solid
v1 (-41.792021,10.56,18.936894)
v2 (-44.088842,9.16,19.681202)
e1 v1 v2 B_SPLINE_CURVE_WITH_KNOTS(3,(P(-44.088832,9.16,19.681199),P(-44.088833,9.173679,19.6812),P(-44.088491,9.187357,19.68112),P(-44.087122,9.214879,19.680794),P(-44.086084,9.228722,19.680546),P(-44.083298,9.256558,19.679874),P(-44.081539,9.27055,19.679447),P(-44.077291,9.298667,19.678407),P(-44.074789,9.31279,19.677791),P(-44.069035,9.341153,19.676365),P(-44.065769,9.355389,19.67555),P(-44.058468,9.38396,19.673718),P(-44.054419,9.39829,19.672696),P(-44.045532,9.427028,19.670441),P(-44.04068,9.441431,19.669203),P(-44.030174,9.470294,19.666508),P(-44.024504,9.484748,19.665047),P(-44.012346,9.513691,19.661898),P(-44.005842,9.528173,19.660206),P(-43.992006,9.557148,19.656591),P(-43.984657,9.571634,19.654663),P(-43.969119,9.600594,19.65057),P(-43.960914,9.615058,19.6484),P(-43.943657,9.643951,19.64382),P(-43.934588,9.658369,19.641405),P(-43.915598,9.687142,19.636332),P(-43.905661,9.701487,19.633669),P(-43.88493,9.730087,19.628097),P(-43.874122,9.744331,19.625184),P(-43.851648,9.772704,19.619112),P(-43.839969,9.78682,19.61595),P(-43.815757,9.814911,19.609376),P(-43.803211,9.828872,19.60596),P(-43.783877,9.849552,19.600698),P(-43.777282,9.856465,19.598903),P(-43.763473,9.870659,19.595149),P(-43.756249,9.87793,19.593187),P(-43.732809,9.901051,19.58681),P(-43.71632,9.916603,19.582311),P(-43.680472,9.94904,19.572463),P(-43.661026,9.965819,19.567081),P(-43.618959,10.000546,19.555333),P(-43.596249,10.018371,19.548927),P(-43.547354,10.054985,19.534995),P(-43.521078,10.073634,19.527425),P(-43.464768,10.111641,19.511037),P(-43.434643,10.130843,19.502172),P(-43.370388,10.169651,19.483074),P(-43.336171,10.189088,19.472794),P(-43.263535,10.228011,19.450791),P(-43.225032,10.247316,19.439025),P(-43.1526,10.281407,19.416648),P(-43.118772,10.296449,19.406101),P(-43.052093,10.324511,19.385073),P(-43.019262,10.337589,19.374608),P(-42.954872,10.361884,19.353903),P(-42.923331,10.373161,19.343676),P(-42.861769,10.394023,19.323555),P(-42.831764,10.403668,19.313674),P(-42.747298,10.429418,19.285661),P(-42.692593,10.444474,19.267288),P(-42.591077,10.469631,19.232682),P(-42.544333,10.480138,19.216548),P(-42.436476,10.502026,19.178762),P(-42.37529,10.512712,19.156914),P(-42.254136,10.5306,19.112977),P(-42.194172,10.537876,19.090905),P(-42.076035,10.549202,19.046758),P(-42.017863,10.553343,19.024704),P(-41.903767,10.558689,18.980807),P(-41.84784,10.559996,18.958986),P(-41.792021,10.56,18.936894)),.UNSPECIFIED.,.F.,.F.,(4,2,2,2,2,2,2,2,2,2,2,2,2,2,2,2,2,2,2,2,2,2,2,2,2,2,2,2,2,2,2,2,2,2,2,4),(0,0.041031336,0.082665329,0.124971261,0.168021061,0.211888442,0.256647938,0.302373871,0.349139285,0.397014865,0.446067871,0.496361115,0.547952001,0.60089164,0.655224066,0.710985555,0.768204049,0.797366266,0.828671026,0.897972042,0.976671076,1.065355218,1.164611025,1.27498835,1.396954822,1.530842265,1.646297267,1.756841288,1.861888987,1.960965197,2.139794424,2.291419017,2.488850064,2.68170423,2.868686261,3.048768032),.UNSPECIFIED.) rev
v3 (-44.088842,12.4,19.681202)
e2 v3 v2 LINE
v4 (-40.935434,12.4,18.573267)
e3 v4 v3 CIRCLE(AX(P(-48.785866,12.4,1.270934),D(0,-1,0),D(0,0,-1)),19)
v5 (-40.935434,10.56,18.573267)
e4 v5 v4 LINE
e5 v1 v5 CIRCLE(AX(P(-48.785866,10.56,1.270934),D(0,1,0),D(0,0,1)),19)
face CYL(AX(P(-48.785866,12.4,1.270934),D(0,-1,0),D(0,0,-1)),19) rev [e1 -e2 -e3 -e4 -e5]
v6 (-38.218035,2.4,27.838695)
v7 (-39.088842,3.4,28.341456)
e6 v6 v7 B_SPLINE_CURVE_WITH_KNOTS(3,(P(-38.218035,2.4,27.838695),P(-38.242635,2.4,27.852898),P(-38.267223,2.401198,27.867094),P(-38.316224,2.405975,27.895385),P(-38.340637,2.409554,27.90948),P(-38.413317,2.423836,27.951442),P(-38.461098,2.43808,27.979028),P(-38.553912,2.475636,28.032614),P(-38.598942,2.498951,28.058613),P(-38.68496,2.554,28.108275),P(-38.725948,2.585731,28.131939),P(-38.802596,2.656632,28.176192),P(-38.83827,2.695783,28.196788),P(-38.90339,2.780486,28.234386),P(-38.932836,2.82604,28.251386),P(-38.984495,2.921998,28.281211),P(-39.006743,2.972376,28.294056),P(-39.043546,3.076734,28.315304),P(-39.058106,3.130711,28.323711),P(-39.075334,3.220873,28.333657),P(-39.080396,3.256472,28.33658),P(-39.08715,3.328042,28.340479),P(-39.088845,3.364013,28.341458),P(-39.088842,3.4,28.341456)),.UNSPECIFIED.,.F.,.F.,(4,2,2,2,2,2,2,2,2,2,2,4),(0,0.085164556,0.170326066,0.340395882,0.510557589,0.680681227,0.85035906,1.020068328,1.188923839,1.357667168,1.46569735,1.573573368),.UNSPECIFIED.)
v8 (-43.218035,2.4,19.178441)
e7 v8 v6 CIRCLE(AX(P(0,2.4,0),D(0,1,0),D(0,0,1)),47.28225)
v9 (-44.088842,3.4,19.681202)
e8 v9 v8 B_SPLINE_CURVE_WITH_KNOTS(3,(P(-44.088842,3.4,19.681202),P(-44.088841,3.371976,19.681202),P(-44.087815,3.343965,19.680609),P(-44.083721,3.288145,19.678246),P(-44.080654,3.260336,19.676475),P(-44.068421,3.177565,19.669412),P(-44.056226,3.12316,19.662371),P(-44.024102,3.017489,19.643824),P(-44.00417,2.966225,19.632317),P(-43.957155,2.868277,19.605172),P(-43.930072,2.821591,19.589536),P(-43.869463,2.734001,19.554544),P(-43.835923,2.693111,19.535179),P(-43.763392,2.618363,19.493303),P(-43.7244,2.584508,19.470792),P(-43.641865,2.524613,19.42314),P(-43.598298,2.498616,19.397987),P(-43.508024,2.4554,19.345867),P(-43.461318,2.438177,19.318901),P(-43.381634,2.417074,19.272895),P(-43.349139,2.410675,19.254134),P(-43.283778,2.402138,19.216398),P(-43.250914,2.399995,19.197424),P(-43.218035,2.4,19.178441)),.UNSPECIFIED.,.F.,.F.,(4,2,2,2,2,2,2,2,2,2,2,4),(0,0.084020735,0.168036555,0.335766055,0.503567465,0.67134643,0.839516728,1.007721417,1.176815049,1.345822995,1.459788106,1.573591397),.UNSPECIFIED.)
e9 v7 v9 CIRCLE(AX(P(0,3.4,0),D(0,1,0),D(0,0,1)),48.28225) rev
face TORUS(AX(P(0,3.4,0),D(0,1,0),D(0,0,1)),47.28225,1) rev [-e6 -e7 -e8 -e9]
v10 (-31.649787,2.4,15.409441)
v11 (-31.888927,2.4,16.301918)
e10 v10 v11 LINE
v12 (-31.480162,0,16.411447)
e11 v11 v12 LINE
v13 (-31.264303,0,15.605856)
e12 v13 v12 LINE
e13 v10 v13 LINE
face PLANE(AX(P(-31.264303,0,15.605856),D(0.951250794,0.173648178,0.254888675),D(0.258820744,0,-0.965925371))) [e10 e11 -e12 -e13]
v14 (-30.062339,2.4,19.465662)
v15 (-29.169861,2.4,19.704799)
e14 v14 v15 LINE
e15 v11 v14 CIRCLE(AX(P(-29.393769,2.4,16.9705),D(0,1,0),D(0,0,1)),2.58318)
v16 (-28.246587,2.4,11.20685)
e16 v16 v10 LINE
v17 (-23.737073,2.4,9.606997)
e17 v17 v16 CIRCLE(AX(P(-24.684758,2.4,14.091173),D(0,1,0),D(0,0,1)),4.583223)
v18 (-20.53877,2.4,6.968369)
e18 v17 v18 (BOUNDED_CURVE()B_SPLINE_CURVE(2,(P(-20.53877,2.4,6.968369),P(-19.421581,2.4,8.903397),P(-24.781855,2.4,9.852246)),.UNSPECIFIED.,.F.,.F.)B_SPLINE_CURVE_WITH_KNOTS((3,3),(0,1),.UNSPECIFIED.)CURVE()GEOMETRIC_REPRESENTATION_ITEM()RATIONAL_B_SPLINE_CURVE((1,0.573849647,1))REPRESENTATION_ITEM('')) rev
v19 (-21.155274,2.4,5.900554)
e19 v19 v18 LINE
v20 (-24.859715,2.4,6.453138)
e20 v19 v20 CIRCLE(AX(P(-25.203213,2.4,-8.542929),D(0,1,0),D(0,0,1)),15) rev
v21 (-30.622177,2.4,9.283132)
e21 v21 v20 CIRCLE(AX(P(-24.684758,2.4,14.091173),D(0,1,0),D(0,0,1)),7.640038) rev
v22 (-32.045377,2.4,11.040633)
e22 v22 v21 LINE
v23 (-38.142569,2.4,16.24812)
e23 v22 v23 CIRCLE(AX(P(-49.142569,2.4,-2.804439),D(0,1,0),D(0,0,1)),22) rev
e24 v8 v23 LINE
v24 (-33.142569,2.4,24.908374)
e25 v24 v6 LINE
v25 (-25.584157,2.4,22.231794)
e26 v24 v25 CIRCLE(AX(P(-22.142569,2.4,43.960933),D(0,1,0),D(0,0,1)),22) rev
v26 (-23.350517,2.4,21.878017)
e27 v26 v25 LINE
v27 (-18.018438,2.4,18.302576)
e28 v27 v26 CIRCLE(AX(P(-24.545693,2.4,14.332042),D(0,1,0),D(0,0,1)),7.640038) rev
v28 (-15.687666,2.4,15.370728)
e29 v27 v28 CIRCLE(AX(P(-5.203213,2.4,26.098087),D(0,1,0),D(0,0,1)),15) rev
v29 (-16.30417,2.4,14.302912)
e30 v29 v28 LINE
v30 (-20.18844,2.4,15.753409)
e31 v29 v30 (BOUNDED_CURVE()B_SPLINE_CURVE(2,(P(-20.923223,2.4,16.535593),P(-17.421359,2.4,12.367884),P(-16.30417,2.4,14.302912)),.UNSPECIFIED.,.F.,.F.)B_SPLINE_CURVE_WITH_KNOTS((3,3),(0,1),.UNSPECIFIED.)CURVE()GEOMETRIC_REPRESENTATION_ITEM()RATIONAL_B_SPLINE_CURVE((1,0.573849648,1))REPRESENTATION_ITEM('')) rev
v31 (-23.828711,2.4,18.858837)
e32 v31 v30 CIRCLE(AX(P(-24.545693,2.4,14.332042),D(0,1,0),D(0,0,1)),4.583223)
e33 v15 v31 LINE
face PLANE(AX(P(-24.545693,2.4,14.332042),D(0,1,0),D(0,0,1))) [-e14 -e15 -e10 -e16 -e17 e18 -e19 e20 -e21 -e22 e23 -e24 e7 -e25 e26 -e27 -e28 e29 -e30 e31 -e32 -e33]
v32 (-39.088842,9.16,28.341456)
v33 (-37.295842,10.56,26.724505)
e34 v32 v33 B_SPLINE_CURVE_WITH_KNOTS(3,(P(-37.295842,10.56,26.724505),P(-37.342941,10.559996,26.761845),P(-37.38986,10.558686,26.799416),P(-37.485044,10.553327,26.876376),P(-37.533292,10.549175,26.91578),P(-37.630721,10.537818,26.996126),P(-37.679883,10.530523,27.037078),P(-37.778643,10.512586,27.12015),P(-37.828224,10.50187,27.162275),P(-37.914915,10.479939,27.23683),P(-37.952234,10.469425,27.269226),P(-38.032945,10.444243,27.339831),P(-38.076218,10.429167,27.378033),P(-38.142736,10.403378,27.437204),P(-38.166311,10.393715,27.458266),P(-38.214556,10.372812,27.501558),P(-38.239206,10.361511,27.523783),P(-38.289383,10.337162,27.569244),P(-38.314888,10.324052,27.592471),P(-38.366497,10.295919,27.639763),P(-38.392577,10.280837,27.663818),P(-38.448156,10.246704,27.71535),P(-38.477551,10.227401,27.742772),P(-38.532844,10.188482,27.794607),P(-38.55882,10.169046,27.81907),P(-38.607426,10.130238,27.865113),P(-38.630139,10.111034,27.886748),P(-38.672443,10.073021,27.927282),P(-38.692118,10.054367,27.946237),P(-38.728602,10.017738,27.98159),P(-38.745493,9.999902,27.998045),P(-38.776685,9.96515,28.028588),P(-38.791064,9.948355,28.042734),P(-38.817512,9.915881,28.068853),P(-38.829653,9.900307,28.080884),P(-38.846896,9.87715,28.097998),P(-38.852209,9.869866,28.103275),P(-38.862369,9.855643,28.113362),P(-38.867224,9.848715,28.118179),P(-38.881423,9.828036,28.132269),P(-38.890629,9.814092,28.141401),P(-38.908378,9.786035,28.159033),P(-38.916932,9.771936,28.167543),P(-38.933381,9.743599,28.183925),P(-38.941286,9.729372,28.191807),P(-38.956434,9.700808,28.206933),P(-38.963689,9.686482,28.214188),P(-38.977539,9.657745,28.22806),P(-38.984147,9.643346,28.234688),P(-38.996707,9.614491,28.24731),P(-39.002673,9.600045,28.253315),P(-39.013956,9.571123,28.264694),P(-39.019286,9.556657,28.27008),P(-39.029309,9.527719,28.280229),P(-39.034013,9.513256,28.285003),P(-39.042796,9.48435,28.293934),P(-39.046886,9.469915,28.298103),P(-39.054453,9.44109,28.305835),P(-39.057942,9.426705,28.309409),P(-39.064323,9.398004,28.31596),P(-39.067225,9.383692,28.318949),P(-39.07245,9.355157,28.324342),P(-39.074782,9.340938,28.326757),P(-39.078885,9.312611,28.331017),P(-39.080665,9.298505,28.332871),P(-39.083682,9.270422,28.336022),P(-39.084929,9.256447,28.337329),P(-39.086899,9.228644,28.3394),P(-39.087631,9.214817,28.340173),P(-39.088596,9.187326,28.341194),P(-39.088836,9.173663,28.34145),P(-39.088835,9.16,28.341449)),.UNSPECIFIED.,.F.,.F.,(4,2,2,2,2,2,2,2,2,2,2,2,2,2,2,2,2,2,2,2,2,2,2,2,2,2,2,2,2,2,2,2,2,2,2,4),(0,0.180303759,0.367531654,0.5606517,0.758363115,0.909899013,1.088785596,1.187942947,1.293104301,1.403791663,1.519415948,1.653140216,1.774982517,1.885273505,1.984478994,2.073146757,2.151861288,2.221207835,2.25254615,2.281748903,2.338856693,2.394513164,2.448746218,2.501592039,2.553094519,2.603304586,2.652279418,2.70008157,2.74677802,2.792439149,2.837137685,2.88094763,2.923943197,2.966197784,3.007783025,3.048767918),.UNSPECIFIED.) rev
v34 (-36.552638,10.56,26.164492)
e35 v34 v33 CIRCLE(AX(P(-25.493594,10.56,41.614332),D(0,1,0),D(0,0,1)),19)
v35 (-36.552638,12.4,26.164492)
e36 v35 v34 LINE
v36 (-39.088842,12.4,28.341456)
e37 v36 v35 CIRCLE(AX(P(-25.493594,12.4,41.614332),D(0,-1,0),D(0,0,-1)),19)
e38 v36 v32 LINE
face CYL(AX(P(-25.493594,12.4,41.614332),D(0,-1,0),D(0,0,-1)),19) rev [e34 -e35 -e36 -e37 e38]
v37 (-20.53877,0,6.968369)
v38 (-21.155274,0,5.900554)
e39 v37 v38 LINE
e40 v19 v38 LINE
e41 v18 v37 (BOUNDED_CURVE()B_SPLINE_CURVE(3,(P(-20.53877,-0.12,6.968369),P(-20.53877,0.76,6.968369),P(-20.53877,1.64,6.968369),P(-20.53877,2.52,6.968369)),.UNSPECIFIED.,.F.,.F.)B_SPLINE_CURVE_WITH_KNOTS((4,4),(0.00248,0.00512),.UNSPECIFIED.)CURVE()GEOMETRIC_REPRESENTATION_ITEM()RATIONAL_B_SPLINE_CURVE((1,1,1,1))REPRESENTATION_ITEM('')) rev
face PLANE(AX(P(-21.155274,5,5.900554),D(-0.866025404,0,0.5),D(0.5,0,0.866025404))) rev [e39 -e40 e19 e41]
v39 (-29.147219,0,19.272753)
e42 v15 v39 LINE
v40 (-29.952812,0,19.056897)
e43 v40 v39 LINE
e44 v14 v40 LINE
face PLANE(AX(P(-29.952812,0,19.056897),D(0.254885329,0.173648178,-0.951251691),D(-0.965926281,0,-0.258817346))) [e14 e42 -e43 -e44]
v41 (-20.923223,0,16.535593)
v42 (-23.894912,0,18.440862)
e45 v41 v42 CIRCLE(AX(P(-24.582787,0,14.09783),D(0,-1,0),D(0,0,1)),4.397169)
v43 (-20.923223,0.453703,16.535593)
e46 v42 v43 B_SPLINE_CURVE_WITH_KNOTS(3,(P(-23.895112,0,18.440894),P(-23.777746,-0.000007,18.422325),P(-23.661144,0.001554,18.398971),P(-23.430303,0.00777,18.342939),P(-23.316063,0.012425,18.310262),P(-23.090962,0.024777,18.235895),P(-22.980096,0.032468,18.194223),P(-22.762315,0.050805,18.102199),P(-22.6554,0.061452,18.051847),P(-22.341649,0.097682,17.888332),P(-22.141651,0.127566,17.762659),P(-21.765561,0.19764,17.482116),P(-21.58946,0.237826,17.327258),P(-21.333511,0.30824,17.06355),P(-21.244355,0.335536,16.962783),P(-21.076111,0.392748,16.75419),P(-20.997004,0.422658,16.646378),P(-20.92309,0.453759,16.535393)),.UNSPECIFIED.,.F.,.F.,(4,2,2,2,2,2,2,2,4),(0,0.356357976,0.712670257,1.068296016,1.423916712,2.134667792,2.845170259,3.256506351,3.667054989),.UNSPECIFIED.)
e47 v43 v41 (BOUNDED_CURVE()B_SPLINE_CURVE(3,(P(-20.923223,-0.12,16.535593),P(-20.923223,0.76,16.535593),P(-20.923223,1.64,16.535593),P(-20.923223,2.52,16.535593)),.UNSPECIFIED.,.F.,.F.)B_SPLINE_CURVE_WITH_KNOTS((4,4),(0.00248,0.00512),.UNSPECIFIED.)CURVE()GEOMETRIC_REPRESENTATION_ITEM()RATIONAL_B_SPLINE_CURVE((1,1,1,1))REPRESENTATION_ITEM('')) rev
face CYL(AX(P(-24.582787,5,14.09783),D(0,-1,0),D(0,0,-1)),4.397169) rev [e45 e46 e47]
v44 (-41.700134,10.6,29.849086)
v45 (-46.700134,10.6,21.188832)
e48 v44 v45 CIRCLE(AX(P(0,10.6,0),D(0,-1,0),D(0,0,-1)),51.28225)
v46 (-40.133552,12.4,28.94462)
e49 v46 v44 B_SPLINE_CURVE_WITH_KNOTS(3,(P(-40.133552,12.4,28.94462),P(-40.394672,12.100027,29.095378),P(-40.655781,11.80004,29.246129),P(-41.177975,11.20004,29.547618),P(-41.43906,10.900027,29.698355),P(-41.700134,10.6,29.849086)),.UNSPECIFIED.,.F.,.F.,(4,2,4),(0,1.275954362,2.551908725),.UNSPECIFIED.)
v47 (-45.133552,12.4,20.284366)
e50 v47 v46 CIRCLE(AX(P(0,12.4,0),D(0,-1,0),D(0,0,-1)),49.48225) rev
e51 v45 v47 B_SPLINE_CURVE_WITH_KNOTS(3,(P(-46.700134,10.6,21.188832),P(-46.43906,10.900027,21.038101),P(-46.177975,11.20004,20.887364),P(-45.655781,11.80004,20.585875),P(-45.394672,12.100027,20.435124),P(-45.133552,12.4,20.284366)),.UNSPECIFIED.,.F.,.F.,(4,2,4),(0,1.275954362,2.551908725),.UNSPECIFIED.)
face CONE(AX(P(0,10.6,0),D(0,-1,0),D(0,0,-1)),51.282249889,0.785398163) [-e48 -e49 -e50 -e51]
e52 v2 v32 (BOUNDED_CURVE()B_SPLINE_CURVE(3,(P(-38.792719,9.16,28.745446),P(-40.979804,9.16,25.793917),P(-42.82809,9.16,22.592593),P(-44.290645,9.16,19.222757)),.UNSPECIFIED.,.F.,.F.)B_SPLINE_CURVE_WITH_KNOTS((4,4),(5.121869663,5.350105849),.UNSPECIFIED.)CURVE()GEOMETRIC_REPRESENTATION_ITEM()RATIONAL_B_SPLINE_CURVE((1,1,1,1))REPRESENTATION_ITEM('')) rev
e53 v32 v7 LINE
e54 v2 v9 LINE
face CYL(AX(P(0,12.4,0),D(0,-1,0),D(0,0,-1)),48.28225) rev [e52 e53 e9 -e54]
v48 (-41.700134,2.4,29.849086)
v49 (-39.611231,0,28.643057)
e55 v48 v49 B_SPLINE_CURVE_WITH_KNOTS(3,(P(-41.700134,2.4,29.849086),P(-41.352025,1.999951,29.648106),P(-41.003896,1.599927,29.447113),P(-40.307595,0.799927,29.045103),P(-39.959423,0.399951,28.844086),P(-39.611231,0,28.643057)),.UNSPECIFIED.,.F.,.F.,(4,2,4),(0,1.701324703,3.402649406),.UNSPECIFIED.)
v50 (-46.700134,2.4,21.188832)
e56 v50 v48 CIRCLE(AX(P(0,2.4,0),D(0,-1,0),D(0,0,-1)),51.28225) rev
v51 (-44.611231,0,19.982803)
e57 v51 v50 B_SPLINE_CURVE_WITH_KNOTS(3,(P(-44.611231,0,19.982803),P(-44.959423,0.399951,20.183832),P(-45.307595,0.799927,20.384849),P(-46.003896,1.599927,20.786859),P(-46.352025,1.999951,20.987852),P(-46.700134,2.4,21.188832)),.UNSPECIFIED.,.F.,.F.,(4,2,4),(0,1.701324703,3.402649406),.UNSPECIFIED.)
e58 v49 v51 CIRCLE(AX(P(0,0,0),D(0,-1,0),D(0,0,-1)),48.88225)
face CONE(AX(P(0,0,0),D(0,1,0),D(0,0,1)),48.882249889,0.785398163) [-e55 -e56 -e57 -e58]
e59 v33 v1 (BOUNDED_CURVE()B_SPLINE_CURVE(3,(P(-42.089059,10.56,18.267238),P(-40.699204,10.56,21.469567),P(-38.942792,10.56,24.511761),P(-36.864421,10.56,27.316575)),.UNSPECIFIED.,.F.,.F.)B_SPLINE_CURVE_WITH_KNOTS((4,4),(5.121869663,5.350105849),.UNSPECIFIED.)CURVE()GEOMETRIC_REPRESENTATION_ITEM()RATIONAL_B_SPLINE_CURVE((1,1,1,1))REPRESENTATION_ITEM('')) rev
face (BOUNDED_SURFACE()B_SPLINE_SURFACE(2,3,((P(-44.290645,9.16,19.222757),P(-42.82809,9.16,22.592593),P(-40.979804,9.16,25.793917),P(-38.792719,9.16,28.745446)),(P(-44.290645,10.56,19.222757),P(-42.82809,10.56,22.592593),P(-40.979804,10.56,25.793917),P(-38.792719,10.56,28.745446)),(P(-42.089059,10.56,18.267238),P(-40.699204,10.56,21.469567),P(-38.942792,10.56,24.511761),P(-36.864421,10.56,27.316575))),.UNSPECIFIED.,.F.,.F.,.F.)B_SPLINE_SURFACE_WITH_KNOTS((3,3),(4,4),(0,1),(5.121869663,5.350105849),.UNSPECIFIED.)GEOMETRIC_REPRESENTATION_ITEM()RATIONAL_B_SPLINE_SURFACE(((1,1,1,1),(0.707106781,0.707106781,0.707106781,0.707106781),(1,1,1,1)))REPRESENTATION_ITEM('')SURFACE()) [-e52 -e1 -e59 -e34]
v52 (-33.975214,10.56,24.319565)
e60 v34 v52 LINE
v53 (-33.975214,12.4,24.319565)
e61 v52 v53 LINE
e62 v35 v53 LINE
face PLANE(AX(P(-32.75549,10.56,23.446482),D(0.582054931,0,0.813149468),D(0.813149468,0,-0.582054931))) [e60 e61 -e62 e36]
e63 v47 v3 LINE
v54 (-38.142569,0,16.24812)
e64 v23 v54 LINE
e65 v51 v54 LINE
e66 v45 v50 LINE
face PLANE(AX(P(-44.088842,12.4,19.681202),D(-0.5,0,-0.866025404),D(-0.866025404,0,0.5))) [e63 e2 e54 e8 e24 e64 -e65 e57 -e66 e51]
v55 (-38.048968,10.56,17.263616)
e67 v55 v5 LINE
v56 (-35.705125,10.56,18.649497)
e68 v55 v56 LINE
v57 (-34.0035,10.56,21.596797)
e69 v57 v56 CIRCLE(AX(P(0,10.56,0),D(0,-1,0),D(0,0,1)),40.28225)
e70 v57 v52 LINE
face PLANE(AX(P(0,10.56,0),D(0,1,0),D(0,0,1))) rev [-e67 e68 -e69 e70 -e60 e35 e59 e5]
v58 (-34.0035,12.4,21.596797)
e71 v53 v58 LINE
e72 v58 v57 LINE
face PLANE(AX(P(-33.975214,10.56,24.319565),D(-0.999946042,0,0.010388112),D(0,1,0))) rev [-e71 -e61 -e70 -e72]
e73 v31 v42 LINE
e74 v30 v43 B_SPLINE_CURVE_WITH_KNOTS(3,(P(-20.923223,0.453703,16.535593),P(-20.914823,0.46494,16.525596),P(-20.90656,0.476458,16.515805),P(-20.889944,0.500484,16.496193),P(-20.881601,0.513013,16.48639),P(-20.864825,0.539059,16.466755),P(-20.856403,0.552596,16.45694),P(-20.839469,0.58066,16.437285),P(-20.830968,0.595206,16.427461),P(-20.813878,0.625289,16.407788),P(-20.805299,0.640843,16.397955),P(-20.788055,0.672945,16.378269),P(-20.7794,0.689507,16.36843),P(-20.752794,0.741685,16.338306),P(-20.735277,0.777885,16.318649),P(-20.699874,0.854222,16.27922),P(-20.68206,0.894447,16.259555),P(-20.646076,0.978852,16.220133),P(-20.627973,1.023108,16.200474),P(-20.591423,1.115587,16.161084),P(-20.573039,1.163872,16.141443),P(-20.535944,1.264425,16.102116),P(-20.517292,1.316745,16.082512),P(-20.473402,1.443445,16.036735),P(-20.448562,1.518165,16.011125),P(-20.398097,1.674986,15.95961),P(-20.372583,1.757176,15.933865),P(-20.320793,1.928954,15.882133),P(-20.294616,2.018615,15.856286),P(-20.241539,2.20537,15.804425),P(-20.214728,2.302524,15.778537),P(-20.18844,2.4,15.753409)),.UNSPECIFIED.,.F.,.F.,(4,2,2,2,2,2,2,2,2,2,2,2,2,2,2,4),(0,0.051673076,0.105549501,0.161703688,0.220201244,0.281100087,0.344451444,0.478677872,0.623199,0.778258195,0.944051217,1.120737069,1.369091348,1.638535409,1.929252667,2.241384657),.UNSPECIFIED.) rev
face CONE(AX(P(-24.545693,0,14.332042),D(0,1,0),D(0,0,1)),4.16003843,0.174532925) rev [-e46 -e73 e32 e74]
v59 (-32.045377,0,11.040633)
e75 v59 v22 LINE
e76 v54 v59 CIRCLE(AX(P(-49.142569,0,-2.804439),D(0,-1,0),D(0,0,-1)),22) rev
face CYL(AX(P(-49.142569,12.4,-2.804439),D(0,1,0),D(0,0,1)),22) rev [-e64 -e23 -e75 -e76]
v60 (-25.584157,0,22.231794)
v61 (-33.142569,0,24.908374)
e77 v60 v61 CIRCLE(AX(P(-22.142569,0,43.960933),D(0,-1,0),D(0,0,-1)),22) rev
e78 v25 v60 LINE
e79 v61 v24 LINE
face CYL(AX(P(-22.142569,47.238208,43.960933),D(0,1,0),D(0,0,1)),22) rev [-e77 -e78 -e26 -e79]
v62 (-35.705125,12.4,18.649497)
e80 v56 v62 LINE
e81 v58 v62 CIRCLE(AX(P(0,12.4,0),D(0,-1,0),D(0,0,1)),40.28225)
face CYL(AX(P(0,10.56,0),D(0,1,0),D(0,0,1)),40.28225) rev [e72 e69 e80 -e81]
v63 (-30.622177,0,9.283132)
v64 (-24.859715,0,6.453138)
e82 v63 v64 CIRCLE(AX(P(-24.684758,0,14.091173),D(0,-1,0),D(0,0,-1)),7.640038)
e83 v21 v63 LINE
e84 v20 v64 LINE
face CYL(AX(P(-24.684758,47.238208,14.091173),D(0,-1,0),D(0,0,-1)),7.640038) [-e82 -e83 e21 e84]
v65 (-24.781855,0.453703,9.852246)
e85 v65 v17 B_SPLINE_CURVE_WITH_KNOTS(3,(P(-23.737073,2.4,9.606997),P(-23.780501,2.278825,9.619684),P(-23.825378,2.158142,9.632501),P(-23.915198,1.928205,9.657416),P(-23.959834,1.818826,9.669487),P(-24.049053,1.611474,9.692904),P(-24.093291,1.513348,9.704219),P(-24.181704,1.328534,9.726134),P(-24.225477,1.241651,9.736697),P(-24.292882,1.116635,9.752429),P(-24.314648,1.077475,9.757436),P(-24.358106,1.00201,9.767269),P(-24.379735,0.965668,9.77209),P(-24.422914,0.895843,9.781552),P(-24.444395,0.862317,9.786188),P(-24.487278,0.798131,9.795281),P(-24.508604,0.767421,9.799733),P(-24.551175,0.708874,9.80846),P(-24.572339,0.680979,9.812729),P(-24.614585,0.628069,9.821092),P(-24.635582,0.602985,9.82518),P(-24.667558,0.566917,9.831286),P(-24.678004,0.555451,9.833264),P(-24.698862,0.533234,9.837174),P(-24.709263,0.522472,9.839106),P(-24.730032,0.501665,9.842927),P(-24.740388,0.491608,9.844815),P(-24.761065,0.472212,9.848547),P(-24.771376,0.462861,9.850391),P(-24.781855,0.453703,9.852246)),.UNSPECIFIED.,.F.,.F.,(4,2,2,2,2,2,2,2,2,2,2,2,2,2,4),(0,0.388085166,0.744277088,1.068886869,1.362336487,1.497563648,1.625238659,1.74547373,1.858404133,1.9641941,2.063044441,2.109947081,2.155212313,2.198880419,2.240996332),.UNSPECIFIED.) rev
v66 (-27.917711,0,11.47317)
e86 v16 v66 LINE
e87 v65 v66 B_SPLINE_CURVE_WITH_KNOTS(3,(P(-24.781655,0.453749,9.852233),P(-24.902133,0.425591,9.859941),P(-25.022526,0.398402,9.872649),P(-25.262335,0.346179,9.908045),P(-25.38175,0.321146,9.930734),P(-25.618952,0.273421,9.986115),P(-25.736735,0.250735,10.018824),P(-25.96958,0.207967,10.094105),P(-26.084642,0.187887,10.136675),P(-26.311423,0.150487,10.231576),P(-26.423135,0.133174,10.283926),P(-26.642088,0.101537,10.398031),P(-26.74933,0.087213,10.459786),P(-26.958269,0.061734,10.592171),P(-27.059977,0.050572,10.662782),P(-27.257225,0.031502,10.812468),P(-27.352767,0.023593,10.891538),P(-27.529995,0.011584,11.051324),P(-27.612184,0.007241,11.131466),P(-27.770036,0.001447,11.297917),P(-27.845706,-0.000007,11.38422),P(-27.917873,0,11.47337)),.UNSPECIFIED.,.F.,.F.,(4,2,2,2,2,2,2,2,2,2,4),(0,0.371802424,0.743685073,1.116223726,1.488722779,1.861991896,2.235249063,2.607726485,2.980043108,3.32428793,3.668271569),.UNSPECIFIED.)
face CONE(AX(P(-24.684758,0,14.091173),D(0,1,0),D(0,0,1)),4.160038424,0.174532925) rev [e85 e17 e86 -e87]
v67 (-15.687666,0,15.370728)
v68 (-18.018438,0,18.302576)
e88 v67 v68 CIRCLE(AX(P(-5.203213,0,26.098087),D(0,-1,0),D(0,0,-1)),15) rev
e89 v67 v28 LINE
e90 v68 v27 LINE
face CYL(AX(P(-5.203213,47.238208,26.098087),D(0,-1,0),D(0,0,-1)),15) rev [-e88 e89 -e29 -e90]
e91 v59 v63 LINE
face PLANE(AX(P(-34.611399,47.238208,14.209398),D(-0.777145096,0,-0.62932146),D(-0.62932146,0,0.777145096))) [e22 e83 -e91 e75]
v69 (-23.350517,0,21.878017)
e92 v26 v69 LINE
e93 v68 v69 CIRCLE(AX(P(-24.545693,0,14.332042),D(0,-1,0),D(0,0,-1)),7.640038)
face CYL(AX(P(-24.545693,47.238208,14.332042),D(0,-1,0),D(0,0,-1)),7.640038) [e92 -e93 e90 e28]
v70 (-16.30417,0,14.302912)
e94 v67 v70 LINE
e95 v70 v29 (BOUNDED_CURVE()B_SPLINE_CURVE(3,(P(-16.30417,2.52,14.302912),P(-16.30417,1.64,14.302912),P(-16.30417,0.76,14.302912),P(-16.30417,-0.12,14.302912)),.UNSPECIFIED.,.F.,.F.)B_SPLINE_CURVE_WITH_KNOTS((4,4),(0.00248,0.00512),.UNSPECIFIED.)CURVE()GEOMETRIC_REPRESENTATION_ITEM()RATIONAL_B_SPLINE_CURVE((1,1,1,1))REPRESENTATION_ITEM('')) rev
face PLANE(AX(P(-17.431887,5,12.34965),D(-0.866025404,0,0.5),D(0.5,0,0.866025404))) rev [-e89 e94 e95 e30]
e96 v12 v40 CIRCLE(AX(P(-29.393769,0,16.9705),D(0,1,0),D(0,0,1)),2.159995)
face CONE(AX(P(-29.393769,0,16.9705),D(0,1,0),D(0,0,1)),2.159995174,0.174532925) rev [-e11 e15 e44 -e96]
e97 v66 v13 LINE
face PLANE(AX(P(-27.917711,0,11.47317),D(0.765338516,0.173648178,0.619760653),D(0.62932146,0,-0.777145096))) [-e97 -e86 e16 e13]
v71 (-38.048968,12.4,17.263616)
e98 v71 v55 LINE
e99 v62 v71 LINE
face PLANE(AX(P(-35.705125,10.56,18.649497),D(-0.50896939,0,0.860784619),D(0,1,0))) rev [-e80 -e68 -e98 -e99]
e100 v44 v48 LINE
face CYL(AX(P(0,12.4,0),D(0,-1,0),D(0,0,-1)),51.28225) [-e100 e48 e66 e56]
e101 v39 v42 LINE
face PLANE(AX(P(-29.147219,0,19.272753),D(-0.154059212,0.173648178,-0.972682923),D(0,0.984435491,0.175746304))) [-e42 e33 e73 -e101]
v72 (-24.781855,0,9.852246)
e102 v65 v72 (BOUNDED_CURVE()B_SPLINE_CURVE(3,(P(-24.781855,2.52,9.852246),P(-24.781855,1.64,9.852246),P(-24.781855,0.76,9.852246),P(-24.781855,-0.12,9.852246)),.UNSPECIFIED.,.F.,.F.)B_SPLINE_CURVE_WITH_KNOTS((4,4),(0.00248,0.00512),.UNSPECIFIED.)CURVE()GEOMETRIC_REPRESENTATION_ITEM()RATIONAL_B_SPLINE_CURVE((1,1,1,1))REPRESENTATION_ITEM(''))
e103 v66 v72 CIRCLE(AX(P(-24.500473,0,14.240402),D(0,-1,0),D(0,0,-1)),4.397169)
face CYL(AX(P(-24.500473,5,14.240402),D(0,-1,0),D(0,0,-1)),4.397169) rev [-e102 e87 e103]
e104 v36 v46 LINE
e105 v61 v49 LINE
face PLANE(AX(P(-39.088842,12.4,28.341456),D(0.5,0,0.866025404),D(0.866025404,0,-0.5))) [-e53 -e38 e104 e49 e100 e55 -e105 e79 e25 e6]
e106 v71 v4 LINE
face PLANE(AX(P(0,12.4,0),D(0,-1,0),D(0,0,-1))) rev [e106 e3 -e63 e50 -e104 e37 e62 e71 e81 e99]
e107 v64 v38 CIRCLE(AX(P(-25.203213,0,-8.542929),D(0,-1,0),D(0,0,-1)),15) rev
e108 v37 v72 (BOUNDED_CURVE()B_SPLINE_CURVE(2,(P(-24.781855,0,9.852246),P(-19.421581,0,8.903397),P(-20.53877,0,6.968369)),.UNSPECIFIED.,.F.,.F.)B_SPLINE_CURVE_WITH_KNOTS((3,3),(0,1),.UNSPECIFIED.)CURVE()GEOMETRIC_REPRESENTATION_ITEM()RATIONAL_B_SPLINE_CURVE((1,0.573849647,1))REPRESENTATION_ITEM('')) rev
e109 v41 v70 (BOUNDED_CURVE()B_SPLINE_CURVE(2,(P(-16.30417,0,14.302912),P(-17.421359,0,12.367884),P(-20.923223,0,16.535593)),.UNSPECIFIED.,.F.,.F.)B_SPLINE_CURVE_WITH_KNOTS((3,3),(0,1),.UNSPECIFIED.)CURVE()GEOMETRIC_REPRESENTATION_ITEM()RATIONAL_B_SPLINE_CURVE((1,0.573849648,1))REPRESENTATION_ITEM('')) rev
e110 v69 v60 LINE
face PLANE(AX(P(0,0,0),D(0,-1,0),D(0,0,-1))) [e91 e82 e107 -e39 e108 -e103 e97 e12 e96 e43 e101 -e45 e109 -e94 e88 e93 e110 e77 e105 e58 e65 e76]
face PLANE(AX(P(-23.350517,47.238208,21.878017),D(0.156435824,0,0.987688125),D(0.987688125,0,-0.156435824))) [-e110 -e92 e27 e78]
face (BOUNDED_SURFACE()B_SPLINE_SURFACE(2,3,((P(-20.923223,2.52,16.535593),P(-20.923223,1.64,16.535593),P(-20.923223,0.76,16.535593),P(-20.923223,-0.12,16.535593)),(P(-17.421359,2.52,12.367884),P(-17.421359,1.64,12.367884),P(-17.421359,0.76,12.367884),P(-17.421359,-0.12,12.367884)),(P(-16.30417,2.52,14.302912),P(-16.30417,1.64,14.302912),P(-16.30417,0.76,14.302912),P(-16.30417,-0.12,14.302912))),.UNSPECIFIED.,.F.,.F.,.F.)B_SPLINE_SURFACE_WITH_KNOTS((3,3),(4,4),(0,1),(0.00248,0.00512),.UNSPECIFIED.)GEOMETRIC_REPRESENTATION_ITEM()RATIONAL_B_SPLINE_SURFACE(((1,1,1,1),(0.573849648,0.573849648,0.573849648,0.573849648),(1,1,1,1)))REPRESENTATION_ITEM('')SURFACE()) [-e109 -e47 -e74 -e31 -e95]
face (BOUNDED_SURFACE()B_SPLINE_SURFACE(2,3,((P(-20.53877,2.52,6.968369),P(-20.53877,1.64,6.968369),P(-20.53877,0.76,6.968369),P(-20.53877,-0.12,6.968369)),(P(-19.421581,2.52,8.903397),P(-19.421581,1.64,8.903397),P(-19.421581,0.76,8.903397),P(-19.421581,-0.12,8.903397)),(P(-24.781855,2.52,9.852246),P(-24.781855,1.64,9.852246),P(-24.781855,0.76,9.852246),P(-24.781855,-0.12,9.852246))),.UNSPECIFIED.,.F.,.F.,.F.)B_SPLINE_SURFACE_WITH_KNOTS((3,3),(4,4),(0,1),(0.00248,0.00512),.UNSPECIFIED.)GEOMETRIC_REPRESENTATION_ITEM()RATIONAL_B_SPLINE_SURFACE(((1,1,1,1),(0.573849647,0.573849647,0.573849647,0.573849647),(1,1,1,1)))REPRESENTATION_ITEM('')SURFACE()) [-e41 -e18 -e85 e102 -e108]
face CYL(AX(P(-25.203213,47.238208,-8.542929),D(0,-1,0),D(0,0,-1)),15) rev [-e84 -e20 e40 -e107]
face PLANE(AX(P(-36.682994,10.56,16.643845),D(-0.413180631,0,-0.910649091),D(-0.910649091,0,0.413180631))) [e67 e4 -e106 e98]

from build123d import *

# Parameters (mm, degrees)
EXTRUDE_1_DEPTH     = 2.4
EXTRUDE_1_DRAFT     = 10
EXTRUDE_2_DEPTH     = 12.4
EXTRUDE_4_DEPTH     = 2.4
EXTRUDE_START       = -1.84
EXTRUDE_3_DEPTH     = 1.84
CHAMFER_1_SIZE      = 2.4
FILLET_3_R          = 1
FILLET_4_R          = 19
CHAMFER_2_SIZE      = 1.5
CHAMFER_3_SIZE      = 1.5
FILLET_5_SIZE       = 2.4
FILLET_5_SIZE_2     = 1.4
FILLET_8_R          = 15
CUT_EXTRUDE_2_DEPTH = 5
FILLET_6_DEPTH      = 2.4
FILLET_7_DEPTH      = 2.4
CHAMFER_4_SIZE      = 1.8
FILLET_9_R          = 22


with BuildPart() as part:
    # 草图1 → 凸台-拉伸1 (with draft: the straight prism first)
    with BuildSketch(Plane(origin=(0, 0, 0), x_dir=(1, 0, 0), z_dir=(0, 1, 0))):
        with BuildLine():
            Line((-8, -10.392304845), (-13, -1.732050808))
            Line((-13, -1.732050808), (-21.967816979, -6.909622355))
            Line((-21.967816979, -6.909622355), (-22.707395472, -6.711455524))
            ThreePointArc((-22.707395472, -6.711455524), (-27.045667208, -6.825066474), (-30.622176838, -9.283132374))
            Line((-30.622176838, -9.283132374), (-34.43427487, -13.990668154))
            Line((-34.43427487, -13.990668154), (-34.611399325, -14.209398026))
            Line((-34.611399325, -14.209398026), (-44.088841542, -19.681201841))
            ThreePointArc((-44.088841542, -19.681201841), (-41.813654956, -24.141124945), (-39.088841542, -28.341455878))
            Line((-39.088841542, -28.341455878), (-29.611399325, -22.869652063))
            Line((-29.611399325, -22.869652063), (-29.333411472, -22.825622721))
            Line((-29.333411472, -22.825622721), (-23.350516885, -21.878016874))
            ThreePointArc((-23.350516885, -21.878016874), (-19.433514554, -20.009701627), (-17.165988715, -16.309453567))
            Line((-17.165988715, -16.309453567), (-16.967816979, -15.569876393))
            Line((-16.967816979, -15.569876393), (-8, -10.392304845))
        make_face()
        with BuildLine():
            Line((-27.917710858, -11.473169763), (-31.264303283, -15.605855609))
            Line((-31.264303283, -15.605855609), (-31.480162481, -16.411447438))
            ThreePointArc((-31.480162481, -16.411447438), (-31.264379417, -18.05049777), (-29.952811807, -19.056896659))
            Line((-29.952811807, -19.056896659), (-29.147219046, -19.27275307))
            Line((-29.147219046, -19.27275307), (-23.894912088, -18.440861966))
            ThreePointArc((-23.894912088, -18.440861966), (-21.762087, -17.423555776), (-20.527408298, -15.408754734))
            Line((-20.527408298, -15.408754734), (-19.958845574, -13.286877913))
            ThreePointArc((-19.958845574, -13.286877913), (-20.174626779, -11.647826039), (-21.486196869, -10.641428268))
            Line((-21.486196869, -10.641428268), (-23.608077089, -10.07287972))
            ThreePointArc((-23.608077089, -10.07287972), (-25.97028529, -10.134742248), (-27.917710858, -11.473169763))
        make_face(mode=Mode.SUBTRACT)
    extrude(amount=EXTRUDE_1_DEPTH)
    # 凸台-拉伸1: the draft: its side faces are tilted about the plane it starts from
    extrude_1_sides = [part.faces().sort_by_distance(p)[0] for p in [
        (-26.480958105, 1.2, 22.373834469),
        (-29.59100707, 1.2, 13.539512686),
        (-31.372232882, 1.2, 16.008651523),
        (-31.264379417, 1.2, 18.05049777),
        (-29.550015427, 1.2, 19.164824864),
        (-26.521065567, 1.2, 18.856807518),
        (-21.762087, 1.2, 17.423555776),
        (-20.243126936, 1.2, 14.347816323),
        (-20.174626779, 1.2, 11.647826039),
        (-22.547136979, 1.2, 10.357153994),
        (-25.97028529, 1.2, 10.134742248),
        (-41.813654956, 1.2, 24.141124945),
        (-39.350120434, 1.2, 16.945299933),
        (-32.616788082, 1.2, 11.7462652),
        (-27.045667208, 1.2, 6.825066474),
        (-22.337606226, 1.2, 6.810538939),
        (-17.48390849, 1.2, 4.320836581),
        (-10.5, 1.2, 6.062177826),
        (-12.48390849, 1.2, 12.981090619),
        (-17.066902847, 1.2, 15.93966498),
        (-34.350120433, 1.2, 25.605553971),
        (-19.433514554, 1.2, 20.009701627),
    ]]
    draft(extrude_1_sides, Plane(origin=(0, 0, 0), x_dir=(1, 0, 0), z_dir=(0, 1, 0)), EXTRUDE_1_DRAFT)



with BuildPart() as body_2:
    # 草图3 → 凸台-拉伸2 (new body)
    with BuildSketch(Plane.XZ):
        with BuildLine():
            Line((-39.088841542, 28.341455878), (-41.700134223, 29.849086411))
            ThreePointArc((-41.700134223, 29.849086411), (-44.411731167, 25.641124945), (-46.700134223, 21.188832373))
            Line((-46.700134223, 21.188832373), (-44.088841542, 19.681201841))
            ThreePointArc((-44.088841542, 19.681201841), (-41.813654956, 24.141124945), (-39.088841542, 28.341455878))
        make_face()
    extrude(amount=-EXTRUDE_2_DEPTH)


with BuildPart() as part_1:
    add(part.part)

    add(body_2.part)  # 凸台-拉伸4 merges body 2
    # 草图2 → 凸台-拉伸4 (add)
    with BuildSketch(Plane.XZ):
        with BuildLine():
            Line((-13, 1.732050808), (-8, 10.392304845))
            Line((-8, 10.392304845), (-16.967816979, 15.569876393))
            Line((-16.967816979, 15.569876393), (-17.165988715, 16.309453567))
            ThreePointArc((-17.165988715, 16.309453567), (-19.433514554, 20.009701627), (-23.350516885, 21.878016874))
            Line((-23.350516885, 21.878016874), (-29.611399325, 22.869652063))
            Line((-29.611399325, 22.869652063), (-39.088841542, 28.341455878))
            ThreePointArc((-39.088841542, 28.341455878), (-41.813654956, 24.141124945), (-44.088841542, 19.681201841))
            Line((-44.088841542, 19.681201841), (-34.611399325, 14.209398026))
            Line((-34.611399325, 14.209398026), (-30.622176838, 9.283132374))
            ThreePointArc((-30.622176838, 9.283132374), (-27.045667208, 6.825066474), (-22.707395472, 6.711455524))
            Line((-22.707395472, 6.711455524), (-21.967816979, 6.909622355))
            Line((-21.967816979, 6.909622355), (-13, 1.732050808))
        make_face()
        Polygon((-28.267922288, 9.695660603), (-32.994912051, 15.569876392), (-31.812956682, 19.594100966), (-26.346816011, 20.919608689), (-19.040272004, 17.121163853), (-18.489608424, 9.956624946), (-26.72941961, 8.295337377), align=None, mode=Mode.SUBTRACT)
    extrude(amount=-EXTRUDE_4_DEPTH)

    # 草图4 → 凸台-拉伸3 (add)
    with BuildSketch(Plane(origin=(0, 12.4, 0), x_dir=(1, 0, 0), z_dir=(0, 1, 0)).offset(EXTRUDE_START)):
        with BuildLine():
            Line((-36.682994227, -16.643845431), (-46.700134223, -21.188832373))
            ThreePointArc((-46.700134223, -21.188832373), (-44.411731167, -25.641124945), (-41.700134223, -29.849086411))
            Line((-41.700134223, -29.849086411), (-32.755490073, -23.446482172))
            ThreePointArc((-32.755490073, -23.446482172), (-34.885451726, -20.141124945), (-36.682994227, -16.643845431))
        make_face()
    extrude(amount=EXTRUDE_3_DEPTH)

    # 倒角1
    chamfer_1_edges = [part_1.edges().sort_by_distance(p)[0] for p in [
        (-44.411731167, 0, 25.641124945),
    ]]
    chamfer(chamfer_1_edges, length=CHAMFER_1_SIZE)

    # 圆角3
    fillet_3_edges = [part_1.edges().sort_by_distance(p)[0] for p in [
        (-41.813654956, 2.4, 24.141124945),
    ]]
    fillet(fillet_3_edges, radius=FILLET_3_R)

    # 圆角4
    # the kernel refuses this fillet: 19 mm, written as the material it adds along each edge
    with BuildSketch(Plane(origin=(-39.260685818, 12.4, 28.102921618), x_dir=(0.5845278463012991, 0, 0.8113736481414496), z_dir=(0, -1, 0))) as fillet_4_piece_1:
        with BuildLine():
            CenterArc((19.010051021, -3.272459571), FILLET_4_R, 170.082224445, 10.092211377)
            Line((0.010139075, -3.33030459), (0, 0))
            ThreePointArc((0, 0), (0.146994089, 0.00022376), (0.293988178, 0))
        make_face()
    extrude(amount=1.84)
    with BuildSketch(Plane(origin=(-43.968186951, 12.4, 19.949290479), x_dir=(-0.4104062681012657, 0, -0.9119027881869821), z_dir=(0, -1, 0))) as fillet_4_piece_2:
        with BuildLine():
            CenterArc((19.010051021, 3.272459571), FILLET_4_R, 179.825564179, 10.092211377)
            Line((0.010139075, 3.33030459), (0, 0))
            ThreePointArc((0, 0), (0.146994089, -0.00022376), (0.293988178, 0))
        make_face()
    extrude(amount=1.84)

    # 倒角2
    # the kernel refuses this chamfer: 2.14222201, 1.5 mm, written as the material it takes off along each edge
    with BuildSketch(Plane(origin=(-36.682994227, 4.801632278, 16.643845431), x_dir=(-0.910649090537952, 0, 0.4131806310833085), z_dir=(0, 1, 0))) as chamfer_2_piece_1:
        with BuildLine():
            Line((CHAMFER_2_SIZE, 0), (-0.061799745, 2.230481193))
            ThreePointArc((-0.061799745, 2.230481193), (-0.016460271, 1.151452368), (0, 0))
            Line((0, 0), (CHAMFER_2_SIZE, 0))
        make_face()
    extrude(amount=13.356735445, mode=Mode.SUBTRACT)

    # 倒角3
    # the kernel refuses this chamfer: 2.14222201, 1.5 mm, written as the material it takes off along each edge
    with BuildSketch(Plane(origin=(-32.755490073, 4.801632278, 23.446482172), x_dir=(-0.5593104278121883, 0, -0.8289582892646329), z_dir=(0, 1, 0))) as chamfer_3_piece_1:
        with BuildLine():
            Line((2.231337169, 0), (-CHAMFER_3_SIZE * 0.0276962827921, CHAMFER_3_SIZE * 0.999616384379))
            Line((-CHAMFER_3_SIZE * 0.0276962827921, CHAMFER_3_SIZE * 0.999616384379), (0, 0))
            ThreePointArc((0, 0), (1.151466541, 0.015436994), (2.231337169, 0))
        make_face()
    extrude(amount=13.356735445, mode=Mode.SUBTRACT)

    # 圆角5
    # a fillet whose section is not a circle: 2.4, 1.4 mm, written as the material it adds along each edge
    with BuildSketch(Plane(origin=(0, 10.56, 0), x_dir=(-0.8131494681386953, 0, 0.582054930797564), z_dir=(0.582054930797564, 0, 0.8131494681386953))) as fillet_5_piece_1:
        with BuildLine():
            Bezier((48.282249889 - FILLET_5_SIZE, 0), (48.282249889, 0), (48.282249889, FILLET_5_SIZE_2), weights=[1, 0.707106781, 1])
            Line((48.282249889, FILLET_5_SIZE_2), (48.282249889, 0))
            Line((48.282249889, 0), (48.282249889 - FILLET_5_SIZE, 0))
        make_face()
    revolve(axis=Axis((0, 10.56, 0), (0, -1, 0)), revolution_arc=11.190411394)
    with BuildSketch(Plane(origin=(-6e-08, 10.56, 4.3e-08), x_dir=(-0.8131494681413899, 0, 0.5820549307937993), z_dir=(-0.5820549307937993, 0, -0.8131494681413899))) as fillet_5_piece_2_section:
        with BuildLine():
            Bezier((48.282249815 - FILLET_5_SIZE, 0), (48.282249815, 0), (48.282249815, -FILLET_5_SIZE_2), weights=[1, 0.707106781, 1])
            Line((48.282249815, -FILLET_5_SIZE_2), (48.282249815, 0))
            Line((48.282249815, 0), (48.282249815 - FILLET_5_SIZE, 0))
        make_face()
    fillet_5_piece_2 = revolve(axis=Axis((-6e-08, 10.56, 4.3e-08), (0, 1, 0)), revolution_arc=7.468976453, mode=Mode.PRIVATE)
    fillet_5_piece_2 = fillet_5_piece_2 - Plane(origin=(-25.493594176, 10.56, 41.614332321), x_dir=(0.5845278463013154, 0, 0.8113736481414379), z_dir=(0, 1, 0)) * Cylinder(19, 194, mode=Mode.PRIVATE)
    add(fillet_5_piece_2)
    with BuildSketch(Plane(origin=(-6.8e-08, 10.56, 3e-08), x_dir=(-0.9106490905361394, 0, 0.4131806310873032), z_dir=(0.4131806310873032, 0, 0.9106490905361394))) as fillet_5_piece_3_section:
        with BuildLine():
            Bezier((48.282249815 - FILLET_5_SIZE, 0), (48.282249815, 0), (48.282249815, FILLET_5_SIZE_2), weights=[1, 0.707106781, 1])
            Line((48.282249815, FILLET_5_SIZE_2), (48.282249815, 0))
            Line((48.282249815, 0), (48.282249815 - FILLET_5_SIZE, 0))
        make_face()
    fillet_5_piece_3 = revolve(axis=Axis((-6.8e-08, 10.56, 3e-08), (0, -1, 0)), revolution_arc=7.468976453, mode=Mode.PRIVATE)
    fillet_5_piece_3 = fillet_5_piece_3 - Plane(origin=(-48.78586604, 10.56, 1.27093403), x_dir=(-0.4104062681010381, 0, -0.9119027881870846), z_dir=(0, 1, 0)) * Cylinder(19, 194, mode=Mode.PRIVATE)
    add(fillet_5_piece_3)

    # 圆角8
    fillet_8_edges = [part_1.edges().sort_by_distance(p)[0] for p in [
        (-16.967816979, 1.2, 15.569876393),
        (-21.967816979, 1.2, 6.909622355),
    ]]
    fillet(fillet_8_edges, radius=FILLET_8_R)

    # 草图5 → 切除-拉伸2 (cut)
    with BuildSketch(Plane.XZ):
        with BuildLine():
            Line((-29.147219046, 19.27275307), (-31.264303283, 15.605855609))
            Line((-31.264303283, 15.605855609), (-27.917710858, 11.473169763))
            ThreePointArc((-27.917710858, 11.473169763), (-26.519580592, 10.33421548), (-24.781854923, 9.852245982))
            ThreePointArc((-24.781854923, 9.852245982), (-22.061802465, 9.586923289), (-19.411053684, 8.921632073))
            Line((-19.411053684, 8.921632073), (-21.155274081, 5.900553727))
            Line((-21.155274081, 5.900553727), (-15.208253994, -4.420406035))
            Line((-15.208253994, -4.420406035), (0.192169605, 10.177783302))
            Line((0.192169605, 10.177783302), (-15.687666464, 15.370727914))
            Line((-15.687666464, 15.370727914), (-17.431886861, 12.349649567))
            ThreePointArc((-17.431886861, 12.349649567), (-19.333420345, 14.312619743), (-20.923222766, 16.535592924))
            ThreePointArc((-20.923222766, 16.535592924), (-22.209483528, 17.799522767), (-23.894912088, 18.440861966))
            Line((-23.894912088, 18.440861966), (-29.147219046, 19.27275307))
        make_face()
    extrude(amount=-CUT_EXTRUDE_2_DEPTH, mode=Mode.SUBTRACT)

    # 圆角6: read off the stored shape, not the designer's step
    # 圆角6 outline → 圆角6 (cut)
    with BuildSketch(Plane(origin=(0, 0, 0), x_dir=(1, 0, 0), z_dir=(0, 1, 0))):
        with BuildLine():
            Line((-19.411053684, -8.921632073), (-20.538770468, -6.968369307))
            add(Edge.make_bspline(
                [(-20.538770468, -6.968369307), (-19.421581423, -8.903397494), (-24.781854923, -9.852245982)],
                knots=[0, 0, 0, 1, 1, 1], degree=2, weights=[1, 0.573849647, 1]))
            ThreePointArc((-24.781854923, -9.852245982), (-22.061802466, -9.586923289), (-19.411053684, -8.921632073))
        make_face()
    extrude(amount=FILLET_6_DEPTH, mode=Mode.SUBTRACT)

    # 圆角7: read off the stored shape, not the designer's step
    # 圆角7 outline → 圆角7 (cut)
    with BuildSketch(Plane(origin=(0, 0, 0), x_dir=(1, 0, 0), z_dir=(0, 1, 0))):
        with BuildLine():
            ThreePointArc((-17.431886861, -12.349649567), (-19.333420346, -14.312619744), (-20.923222767, -16.535592926))
            add(Edge.make_bspline(
                [(-20.923222767, -16.535592926), (-17.421359117, -12.367884155), (-16.304170077, -14.302912333)],
                knots=[0, 0, 0, 1, 1, 1], degree=2, weights=[1, 0.573849648, 1]))
            Line((-16.304170077, -14.302912333), (-17.431886861, -12.349649567))
        make_face()
    extrude(amount=FILLET_7_DEPTH, mode=Mode.SUBTRACT)

    # 倒角4
    chamfer_4_edges = [part_1.edges().sort_by_distance(p)[0] for p in [
        (-44.411731167, 12.4, 25.641124945),
    ]]
    chamfer(chamfer_4_edges, length=CHAMFER_4_SIZE)

    # 圆角9
    fillet_9_edges = [part_1.edges().sort_by_distance(p)[0] for p in [
        (-34.611399325, 1.2, 14.209398026),
        (-29.611399325, 1.2, 22.869652063),
    ]]
    fillet(fillet_9_edges, radius=FILLET_9_R)


solid = part_1.part
